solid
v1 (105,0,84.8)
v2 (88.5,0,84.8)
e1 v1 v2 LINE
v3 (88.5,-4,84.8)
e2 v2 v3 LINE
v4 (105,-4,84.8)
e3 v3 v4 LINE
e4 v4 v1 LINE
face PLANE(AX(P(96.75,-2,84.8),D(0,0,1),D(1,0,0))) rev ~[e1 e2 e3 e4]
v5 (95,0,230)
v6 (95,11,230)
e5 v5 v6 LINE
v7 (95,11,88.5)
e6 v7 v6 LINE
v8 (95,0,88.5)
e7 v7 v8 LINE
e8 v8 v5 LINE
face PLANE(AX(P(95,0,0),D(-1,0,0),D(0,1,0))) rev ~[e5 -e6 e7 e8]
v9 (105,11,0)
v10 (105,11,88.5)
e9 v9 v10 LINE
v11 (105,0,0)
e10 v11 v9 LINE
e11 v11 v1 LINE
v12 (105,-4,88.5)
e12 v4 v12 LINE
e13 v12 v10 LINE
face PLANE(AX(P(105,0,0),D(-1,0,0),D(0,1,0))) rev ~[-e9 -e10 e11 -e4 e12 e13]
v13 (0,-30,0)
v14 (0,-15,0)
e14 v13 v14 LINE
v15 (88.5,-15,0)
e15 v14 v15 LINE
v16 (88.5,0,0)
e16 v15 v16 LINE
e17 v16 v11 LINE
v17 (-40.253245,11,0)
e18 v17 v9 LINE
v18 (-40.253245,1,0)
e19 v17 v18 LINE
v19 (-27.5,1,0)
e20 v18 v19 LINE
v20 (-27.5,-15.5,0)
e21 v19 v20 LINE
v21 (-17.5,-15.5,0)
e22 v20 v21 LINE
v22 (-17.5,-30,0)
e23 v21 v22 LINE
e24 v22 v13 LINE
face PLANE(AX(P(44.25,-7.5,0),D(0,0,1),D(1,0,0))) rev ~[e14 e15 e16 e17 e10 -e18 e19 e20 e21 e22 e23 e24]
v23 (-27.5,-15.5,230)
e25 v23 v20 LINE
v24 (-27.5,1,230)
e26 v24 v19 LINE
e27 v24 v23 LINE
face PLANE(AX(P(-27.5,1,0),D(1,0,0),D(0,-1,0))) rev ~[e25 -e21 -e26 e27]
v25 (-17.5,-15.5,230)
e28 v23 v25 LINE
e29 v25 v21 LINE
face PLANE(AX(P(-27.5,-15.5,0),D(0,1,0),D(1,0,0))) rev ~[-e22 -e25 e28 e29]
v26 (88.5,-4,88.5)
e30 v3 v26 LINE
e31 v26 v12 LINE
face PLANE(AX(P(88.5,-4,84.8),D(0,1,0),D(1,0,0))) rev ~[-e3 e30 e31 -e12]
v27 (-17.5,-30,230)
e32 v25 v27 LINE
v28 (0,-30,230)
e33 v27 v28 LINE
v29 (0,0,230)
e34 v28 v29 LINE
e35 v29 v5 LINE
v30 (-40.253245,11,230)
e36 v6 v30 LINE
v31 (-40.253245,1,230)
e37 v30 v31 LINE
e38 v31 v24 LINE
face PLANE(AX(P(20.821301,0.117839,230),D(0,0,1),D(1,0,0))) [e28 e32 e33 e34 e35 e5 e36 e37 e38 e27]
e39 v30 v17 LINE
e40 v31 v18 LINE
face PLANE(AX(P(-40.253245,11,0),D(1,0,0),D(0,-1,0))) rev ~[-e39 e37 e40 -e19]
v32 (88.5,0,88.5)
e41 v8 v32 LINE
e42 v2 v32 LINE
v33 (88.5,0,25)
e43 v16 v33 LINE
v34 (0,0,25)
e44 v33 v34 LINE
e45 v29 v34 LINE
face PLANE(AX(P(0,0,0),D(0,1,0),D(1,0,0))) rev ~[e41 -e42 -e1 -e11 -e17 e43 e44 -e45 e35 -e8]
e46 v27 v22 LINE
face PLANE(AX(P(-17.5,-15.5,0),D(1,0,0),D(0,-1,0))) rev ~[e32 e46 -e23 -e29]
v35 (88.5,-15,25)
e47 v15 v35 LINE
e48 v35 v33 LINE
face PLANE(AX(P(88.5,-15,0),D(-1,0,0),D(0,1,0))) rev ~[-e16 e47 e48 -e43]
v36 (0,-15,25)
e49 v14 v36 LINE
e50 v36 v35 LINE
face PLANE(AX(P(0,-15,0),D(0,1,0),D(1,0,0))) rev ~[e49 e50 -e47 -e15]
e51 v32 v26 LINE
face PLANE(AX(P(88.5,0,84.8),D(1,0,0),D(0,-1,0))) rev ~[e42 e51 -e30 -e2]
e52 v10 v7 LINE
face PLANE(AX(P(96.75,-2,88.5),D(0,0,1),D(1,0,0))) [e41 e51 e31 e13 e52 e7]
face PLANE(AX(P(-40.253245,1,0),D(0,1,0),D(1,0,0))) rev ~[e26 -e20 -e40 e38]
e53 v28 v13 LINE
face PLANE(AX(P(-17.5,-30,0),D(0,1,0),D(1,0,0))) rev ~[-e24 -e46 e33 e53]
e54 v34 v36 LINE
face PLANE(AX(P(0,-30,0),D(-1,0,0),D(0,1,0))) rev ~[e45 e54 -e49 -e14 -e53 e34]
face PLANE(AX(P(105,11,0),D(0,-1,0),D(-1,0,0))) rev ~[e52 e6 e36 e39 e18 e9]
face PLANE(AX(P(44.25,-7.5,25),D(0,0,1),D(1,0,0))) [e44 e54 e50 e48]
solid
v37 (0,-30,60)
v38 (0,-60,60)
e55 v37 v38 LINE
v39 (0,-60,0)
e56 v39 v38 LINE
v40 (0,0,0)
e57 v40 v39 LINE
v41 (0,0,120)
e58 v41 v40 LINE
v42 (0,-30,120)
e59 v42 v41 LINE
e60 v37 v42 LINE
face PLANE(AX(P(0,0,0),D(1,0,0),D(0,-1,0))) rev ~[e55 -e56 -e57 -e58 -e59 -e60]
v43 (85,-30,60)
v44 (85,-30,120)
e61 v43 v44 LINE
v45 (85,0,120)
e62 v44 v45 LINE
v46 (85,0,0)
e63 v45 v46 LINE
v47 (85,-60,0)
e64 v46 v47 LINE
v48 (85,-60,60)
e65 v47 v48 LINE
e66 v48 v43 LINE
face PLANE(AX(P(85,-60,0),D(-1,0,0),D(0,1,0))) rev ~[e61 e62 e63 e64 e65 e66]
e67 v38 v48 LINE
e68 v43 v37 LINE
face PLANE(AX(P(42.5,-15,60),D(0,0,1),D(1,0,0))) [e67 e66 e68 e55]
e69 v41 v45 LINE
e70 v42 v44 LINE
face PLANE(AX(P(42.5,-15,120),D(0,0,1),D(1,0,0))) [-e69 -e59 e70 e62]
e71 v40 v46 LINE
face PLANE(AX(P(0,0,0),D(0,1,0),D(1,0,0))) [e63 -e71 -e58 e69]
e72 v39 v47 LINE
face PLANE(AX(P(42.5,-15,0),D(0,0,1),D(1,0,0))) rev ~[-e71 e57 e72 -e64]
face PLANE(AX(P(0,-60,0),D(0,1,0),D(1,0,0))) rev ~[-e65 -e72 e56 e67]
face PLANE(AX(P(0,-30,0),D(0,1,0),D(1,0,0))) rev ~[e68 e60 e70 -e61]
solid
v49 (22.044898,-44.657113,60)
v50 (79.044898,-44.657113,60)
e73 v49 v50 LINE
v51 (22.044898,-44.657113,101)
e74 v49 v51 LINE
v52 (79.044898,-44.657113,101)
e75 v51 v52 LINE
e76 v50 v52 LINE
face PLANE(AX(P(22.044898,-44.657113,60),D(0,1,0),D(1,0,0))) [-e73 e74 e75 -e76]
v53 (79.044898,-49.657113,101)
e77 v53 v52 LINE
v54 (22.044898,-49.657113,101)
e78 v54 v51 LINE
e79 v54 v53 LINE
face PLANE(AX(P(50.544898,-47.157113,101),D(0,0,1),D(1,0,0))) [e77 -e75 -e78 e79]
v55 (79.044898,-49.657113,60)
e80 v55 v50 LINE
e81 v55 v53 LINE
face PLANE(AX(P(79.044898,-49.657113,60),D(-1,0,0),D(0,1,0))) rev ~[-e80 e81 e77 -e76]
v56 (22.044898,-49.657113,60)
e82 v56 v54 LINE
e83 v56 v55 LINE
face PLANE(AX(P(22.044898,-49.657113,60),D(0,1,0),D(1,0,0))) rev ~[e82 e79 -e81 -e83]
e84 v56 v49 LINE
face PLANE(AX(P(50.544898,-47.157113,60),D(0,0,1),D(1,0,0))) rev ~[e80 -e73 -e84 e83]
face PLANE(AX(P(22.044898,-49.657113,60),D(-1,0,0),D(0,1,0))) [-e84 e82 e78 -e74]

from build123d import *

# Parameters (mm, degrees)
F0_W     = 10
F0_H     = 11
F1_DEPTH = 88.5
F2_START = 84.8
F2_DEPTH = 3.7
F3_DEPTH = 230
F4_DEPTH = 25
F5_W     = 85
F5_H     = 30
F6_DEPTH = 60
F7_DEPTH = 120
F8_W     = 57
F8_H     = 5
F9_DEPTH = 41


with BuildPart() as f1:
    # F0 (on Top) → F1 (new body)
    with BuildSketch(Plane.XY):
        Polygon((0, -15), (0, 0), (88.5, 0), (95, 0), (95, 11), (-40.2532453754, 11), (-40.2532453754, 1), (-27.5, 1), (-27.5, -15.5), (-17.5, -15.5), (-17.5, -30), (0, -30), align=None)
        with Locations((100, 5.5)):
            Rectangle(F0_W, F0_H)
    extrude(amount=F1_DEPTH)

    # F0 (on Top) → F2 (join)
    with BuildSketch(Plane.XY.offset(F2_START)):
        Polygon((95, 0), (88.5, 0), (88.5, -4), (105, -4), (105, 0), align=None)
    extrude(amount=F2_DEPTH)

    # F0 (on Top) → F3 (join)
    with BuildSketch(Plane.XY):
        Polygon((0, -15), (0, 0), (88.5, 0), (95, 0), (95, 11), (-40.2532453754, 11), (-40.2532453754, 1), (-27.5, 1), (-27.5, -15.5), (-17.5, -15.5), (-17.5, -30), (0, -30), align=None)
    extrude(amount=F3_DEPTH)

    # F0 (on Top) → F4 (join)
    with BuildSketch(Plane.XY):
        Polygon((88.5, 0), (0, 0), (0, -15), (88.5, -15), (88.5, -4), align=None)
    extrude(amount=F4_DEPTH)


with BuildPart() as f6:
    # F5 (on Top) → F6 (new body)
    with BuildSketch(Plane.XY):
        with Locations((42.5, -15)):
            Rectangle(F5_W, F5_H)
        with Locations((42.5, -45)):
            Rectangle(F5_W, F5_H)
    extrude(amount=F6_DEPTH)

    # F5 (on Top) → F7 (join)
    with BuildSketch(Plane.XY):
        with Locations((42.5, -15)):
            Rectangle(F5_W, F5_H)
    extrude(amount=F7_DEPTH)


with BuildPart() as f9:
    # F8 (on face) → F9 (new body)
    with BuildSketch(Plane.XY.offset(60)):
        with Locations((50.5448982381, -47.157112509)):
            Rectangle(F8_W, F8_H)
    extrude(amount=F9_DEPTH)


solid = Compound([f1.part, f6.part, f9.part])
